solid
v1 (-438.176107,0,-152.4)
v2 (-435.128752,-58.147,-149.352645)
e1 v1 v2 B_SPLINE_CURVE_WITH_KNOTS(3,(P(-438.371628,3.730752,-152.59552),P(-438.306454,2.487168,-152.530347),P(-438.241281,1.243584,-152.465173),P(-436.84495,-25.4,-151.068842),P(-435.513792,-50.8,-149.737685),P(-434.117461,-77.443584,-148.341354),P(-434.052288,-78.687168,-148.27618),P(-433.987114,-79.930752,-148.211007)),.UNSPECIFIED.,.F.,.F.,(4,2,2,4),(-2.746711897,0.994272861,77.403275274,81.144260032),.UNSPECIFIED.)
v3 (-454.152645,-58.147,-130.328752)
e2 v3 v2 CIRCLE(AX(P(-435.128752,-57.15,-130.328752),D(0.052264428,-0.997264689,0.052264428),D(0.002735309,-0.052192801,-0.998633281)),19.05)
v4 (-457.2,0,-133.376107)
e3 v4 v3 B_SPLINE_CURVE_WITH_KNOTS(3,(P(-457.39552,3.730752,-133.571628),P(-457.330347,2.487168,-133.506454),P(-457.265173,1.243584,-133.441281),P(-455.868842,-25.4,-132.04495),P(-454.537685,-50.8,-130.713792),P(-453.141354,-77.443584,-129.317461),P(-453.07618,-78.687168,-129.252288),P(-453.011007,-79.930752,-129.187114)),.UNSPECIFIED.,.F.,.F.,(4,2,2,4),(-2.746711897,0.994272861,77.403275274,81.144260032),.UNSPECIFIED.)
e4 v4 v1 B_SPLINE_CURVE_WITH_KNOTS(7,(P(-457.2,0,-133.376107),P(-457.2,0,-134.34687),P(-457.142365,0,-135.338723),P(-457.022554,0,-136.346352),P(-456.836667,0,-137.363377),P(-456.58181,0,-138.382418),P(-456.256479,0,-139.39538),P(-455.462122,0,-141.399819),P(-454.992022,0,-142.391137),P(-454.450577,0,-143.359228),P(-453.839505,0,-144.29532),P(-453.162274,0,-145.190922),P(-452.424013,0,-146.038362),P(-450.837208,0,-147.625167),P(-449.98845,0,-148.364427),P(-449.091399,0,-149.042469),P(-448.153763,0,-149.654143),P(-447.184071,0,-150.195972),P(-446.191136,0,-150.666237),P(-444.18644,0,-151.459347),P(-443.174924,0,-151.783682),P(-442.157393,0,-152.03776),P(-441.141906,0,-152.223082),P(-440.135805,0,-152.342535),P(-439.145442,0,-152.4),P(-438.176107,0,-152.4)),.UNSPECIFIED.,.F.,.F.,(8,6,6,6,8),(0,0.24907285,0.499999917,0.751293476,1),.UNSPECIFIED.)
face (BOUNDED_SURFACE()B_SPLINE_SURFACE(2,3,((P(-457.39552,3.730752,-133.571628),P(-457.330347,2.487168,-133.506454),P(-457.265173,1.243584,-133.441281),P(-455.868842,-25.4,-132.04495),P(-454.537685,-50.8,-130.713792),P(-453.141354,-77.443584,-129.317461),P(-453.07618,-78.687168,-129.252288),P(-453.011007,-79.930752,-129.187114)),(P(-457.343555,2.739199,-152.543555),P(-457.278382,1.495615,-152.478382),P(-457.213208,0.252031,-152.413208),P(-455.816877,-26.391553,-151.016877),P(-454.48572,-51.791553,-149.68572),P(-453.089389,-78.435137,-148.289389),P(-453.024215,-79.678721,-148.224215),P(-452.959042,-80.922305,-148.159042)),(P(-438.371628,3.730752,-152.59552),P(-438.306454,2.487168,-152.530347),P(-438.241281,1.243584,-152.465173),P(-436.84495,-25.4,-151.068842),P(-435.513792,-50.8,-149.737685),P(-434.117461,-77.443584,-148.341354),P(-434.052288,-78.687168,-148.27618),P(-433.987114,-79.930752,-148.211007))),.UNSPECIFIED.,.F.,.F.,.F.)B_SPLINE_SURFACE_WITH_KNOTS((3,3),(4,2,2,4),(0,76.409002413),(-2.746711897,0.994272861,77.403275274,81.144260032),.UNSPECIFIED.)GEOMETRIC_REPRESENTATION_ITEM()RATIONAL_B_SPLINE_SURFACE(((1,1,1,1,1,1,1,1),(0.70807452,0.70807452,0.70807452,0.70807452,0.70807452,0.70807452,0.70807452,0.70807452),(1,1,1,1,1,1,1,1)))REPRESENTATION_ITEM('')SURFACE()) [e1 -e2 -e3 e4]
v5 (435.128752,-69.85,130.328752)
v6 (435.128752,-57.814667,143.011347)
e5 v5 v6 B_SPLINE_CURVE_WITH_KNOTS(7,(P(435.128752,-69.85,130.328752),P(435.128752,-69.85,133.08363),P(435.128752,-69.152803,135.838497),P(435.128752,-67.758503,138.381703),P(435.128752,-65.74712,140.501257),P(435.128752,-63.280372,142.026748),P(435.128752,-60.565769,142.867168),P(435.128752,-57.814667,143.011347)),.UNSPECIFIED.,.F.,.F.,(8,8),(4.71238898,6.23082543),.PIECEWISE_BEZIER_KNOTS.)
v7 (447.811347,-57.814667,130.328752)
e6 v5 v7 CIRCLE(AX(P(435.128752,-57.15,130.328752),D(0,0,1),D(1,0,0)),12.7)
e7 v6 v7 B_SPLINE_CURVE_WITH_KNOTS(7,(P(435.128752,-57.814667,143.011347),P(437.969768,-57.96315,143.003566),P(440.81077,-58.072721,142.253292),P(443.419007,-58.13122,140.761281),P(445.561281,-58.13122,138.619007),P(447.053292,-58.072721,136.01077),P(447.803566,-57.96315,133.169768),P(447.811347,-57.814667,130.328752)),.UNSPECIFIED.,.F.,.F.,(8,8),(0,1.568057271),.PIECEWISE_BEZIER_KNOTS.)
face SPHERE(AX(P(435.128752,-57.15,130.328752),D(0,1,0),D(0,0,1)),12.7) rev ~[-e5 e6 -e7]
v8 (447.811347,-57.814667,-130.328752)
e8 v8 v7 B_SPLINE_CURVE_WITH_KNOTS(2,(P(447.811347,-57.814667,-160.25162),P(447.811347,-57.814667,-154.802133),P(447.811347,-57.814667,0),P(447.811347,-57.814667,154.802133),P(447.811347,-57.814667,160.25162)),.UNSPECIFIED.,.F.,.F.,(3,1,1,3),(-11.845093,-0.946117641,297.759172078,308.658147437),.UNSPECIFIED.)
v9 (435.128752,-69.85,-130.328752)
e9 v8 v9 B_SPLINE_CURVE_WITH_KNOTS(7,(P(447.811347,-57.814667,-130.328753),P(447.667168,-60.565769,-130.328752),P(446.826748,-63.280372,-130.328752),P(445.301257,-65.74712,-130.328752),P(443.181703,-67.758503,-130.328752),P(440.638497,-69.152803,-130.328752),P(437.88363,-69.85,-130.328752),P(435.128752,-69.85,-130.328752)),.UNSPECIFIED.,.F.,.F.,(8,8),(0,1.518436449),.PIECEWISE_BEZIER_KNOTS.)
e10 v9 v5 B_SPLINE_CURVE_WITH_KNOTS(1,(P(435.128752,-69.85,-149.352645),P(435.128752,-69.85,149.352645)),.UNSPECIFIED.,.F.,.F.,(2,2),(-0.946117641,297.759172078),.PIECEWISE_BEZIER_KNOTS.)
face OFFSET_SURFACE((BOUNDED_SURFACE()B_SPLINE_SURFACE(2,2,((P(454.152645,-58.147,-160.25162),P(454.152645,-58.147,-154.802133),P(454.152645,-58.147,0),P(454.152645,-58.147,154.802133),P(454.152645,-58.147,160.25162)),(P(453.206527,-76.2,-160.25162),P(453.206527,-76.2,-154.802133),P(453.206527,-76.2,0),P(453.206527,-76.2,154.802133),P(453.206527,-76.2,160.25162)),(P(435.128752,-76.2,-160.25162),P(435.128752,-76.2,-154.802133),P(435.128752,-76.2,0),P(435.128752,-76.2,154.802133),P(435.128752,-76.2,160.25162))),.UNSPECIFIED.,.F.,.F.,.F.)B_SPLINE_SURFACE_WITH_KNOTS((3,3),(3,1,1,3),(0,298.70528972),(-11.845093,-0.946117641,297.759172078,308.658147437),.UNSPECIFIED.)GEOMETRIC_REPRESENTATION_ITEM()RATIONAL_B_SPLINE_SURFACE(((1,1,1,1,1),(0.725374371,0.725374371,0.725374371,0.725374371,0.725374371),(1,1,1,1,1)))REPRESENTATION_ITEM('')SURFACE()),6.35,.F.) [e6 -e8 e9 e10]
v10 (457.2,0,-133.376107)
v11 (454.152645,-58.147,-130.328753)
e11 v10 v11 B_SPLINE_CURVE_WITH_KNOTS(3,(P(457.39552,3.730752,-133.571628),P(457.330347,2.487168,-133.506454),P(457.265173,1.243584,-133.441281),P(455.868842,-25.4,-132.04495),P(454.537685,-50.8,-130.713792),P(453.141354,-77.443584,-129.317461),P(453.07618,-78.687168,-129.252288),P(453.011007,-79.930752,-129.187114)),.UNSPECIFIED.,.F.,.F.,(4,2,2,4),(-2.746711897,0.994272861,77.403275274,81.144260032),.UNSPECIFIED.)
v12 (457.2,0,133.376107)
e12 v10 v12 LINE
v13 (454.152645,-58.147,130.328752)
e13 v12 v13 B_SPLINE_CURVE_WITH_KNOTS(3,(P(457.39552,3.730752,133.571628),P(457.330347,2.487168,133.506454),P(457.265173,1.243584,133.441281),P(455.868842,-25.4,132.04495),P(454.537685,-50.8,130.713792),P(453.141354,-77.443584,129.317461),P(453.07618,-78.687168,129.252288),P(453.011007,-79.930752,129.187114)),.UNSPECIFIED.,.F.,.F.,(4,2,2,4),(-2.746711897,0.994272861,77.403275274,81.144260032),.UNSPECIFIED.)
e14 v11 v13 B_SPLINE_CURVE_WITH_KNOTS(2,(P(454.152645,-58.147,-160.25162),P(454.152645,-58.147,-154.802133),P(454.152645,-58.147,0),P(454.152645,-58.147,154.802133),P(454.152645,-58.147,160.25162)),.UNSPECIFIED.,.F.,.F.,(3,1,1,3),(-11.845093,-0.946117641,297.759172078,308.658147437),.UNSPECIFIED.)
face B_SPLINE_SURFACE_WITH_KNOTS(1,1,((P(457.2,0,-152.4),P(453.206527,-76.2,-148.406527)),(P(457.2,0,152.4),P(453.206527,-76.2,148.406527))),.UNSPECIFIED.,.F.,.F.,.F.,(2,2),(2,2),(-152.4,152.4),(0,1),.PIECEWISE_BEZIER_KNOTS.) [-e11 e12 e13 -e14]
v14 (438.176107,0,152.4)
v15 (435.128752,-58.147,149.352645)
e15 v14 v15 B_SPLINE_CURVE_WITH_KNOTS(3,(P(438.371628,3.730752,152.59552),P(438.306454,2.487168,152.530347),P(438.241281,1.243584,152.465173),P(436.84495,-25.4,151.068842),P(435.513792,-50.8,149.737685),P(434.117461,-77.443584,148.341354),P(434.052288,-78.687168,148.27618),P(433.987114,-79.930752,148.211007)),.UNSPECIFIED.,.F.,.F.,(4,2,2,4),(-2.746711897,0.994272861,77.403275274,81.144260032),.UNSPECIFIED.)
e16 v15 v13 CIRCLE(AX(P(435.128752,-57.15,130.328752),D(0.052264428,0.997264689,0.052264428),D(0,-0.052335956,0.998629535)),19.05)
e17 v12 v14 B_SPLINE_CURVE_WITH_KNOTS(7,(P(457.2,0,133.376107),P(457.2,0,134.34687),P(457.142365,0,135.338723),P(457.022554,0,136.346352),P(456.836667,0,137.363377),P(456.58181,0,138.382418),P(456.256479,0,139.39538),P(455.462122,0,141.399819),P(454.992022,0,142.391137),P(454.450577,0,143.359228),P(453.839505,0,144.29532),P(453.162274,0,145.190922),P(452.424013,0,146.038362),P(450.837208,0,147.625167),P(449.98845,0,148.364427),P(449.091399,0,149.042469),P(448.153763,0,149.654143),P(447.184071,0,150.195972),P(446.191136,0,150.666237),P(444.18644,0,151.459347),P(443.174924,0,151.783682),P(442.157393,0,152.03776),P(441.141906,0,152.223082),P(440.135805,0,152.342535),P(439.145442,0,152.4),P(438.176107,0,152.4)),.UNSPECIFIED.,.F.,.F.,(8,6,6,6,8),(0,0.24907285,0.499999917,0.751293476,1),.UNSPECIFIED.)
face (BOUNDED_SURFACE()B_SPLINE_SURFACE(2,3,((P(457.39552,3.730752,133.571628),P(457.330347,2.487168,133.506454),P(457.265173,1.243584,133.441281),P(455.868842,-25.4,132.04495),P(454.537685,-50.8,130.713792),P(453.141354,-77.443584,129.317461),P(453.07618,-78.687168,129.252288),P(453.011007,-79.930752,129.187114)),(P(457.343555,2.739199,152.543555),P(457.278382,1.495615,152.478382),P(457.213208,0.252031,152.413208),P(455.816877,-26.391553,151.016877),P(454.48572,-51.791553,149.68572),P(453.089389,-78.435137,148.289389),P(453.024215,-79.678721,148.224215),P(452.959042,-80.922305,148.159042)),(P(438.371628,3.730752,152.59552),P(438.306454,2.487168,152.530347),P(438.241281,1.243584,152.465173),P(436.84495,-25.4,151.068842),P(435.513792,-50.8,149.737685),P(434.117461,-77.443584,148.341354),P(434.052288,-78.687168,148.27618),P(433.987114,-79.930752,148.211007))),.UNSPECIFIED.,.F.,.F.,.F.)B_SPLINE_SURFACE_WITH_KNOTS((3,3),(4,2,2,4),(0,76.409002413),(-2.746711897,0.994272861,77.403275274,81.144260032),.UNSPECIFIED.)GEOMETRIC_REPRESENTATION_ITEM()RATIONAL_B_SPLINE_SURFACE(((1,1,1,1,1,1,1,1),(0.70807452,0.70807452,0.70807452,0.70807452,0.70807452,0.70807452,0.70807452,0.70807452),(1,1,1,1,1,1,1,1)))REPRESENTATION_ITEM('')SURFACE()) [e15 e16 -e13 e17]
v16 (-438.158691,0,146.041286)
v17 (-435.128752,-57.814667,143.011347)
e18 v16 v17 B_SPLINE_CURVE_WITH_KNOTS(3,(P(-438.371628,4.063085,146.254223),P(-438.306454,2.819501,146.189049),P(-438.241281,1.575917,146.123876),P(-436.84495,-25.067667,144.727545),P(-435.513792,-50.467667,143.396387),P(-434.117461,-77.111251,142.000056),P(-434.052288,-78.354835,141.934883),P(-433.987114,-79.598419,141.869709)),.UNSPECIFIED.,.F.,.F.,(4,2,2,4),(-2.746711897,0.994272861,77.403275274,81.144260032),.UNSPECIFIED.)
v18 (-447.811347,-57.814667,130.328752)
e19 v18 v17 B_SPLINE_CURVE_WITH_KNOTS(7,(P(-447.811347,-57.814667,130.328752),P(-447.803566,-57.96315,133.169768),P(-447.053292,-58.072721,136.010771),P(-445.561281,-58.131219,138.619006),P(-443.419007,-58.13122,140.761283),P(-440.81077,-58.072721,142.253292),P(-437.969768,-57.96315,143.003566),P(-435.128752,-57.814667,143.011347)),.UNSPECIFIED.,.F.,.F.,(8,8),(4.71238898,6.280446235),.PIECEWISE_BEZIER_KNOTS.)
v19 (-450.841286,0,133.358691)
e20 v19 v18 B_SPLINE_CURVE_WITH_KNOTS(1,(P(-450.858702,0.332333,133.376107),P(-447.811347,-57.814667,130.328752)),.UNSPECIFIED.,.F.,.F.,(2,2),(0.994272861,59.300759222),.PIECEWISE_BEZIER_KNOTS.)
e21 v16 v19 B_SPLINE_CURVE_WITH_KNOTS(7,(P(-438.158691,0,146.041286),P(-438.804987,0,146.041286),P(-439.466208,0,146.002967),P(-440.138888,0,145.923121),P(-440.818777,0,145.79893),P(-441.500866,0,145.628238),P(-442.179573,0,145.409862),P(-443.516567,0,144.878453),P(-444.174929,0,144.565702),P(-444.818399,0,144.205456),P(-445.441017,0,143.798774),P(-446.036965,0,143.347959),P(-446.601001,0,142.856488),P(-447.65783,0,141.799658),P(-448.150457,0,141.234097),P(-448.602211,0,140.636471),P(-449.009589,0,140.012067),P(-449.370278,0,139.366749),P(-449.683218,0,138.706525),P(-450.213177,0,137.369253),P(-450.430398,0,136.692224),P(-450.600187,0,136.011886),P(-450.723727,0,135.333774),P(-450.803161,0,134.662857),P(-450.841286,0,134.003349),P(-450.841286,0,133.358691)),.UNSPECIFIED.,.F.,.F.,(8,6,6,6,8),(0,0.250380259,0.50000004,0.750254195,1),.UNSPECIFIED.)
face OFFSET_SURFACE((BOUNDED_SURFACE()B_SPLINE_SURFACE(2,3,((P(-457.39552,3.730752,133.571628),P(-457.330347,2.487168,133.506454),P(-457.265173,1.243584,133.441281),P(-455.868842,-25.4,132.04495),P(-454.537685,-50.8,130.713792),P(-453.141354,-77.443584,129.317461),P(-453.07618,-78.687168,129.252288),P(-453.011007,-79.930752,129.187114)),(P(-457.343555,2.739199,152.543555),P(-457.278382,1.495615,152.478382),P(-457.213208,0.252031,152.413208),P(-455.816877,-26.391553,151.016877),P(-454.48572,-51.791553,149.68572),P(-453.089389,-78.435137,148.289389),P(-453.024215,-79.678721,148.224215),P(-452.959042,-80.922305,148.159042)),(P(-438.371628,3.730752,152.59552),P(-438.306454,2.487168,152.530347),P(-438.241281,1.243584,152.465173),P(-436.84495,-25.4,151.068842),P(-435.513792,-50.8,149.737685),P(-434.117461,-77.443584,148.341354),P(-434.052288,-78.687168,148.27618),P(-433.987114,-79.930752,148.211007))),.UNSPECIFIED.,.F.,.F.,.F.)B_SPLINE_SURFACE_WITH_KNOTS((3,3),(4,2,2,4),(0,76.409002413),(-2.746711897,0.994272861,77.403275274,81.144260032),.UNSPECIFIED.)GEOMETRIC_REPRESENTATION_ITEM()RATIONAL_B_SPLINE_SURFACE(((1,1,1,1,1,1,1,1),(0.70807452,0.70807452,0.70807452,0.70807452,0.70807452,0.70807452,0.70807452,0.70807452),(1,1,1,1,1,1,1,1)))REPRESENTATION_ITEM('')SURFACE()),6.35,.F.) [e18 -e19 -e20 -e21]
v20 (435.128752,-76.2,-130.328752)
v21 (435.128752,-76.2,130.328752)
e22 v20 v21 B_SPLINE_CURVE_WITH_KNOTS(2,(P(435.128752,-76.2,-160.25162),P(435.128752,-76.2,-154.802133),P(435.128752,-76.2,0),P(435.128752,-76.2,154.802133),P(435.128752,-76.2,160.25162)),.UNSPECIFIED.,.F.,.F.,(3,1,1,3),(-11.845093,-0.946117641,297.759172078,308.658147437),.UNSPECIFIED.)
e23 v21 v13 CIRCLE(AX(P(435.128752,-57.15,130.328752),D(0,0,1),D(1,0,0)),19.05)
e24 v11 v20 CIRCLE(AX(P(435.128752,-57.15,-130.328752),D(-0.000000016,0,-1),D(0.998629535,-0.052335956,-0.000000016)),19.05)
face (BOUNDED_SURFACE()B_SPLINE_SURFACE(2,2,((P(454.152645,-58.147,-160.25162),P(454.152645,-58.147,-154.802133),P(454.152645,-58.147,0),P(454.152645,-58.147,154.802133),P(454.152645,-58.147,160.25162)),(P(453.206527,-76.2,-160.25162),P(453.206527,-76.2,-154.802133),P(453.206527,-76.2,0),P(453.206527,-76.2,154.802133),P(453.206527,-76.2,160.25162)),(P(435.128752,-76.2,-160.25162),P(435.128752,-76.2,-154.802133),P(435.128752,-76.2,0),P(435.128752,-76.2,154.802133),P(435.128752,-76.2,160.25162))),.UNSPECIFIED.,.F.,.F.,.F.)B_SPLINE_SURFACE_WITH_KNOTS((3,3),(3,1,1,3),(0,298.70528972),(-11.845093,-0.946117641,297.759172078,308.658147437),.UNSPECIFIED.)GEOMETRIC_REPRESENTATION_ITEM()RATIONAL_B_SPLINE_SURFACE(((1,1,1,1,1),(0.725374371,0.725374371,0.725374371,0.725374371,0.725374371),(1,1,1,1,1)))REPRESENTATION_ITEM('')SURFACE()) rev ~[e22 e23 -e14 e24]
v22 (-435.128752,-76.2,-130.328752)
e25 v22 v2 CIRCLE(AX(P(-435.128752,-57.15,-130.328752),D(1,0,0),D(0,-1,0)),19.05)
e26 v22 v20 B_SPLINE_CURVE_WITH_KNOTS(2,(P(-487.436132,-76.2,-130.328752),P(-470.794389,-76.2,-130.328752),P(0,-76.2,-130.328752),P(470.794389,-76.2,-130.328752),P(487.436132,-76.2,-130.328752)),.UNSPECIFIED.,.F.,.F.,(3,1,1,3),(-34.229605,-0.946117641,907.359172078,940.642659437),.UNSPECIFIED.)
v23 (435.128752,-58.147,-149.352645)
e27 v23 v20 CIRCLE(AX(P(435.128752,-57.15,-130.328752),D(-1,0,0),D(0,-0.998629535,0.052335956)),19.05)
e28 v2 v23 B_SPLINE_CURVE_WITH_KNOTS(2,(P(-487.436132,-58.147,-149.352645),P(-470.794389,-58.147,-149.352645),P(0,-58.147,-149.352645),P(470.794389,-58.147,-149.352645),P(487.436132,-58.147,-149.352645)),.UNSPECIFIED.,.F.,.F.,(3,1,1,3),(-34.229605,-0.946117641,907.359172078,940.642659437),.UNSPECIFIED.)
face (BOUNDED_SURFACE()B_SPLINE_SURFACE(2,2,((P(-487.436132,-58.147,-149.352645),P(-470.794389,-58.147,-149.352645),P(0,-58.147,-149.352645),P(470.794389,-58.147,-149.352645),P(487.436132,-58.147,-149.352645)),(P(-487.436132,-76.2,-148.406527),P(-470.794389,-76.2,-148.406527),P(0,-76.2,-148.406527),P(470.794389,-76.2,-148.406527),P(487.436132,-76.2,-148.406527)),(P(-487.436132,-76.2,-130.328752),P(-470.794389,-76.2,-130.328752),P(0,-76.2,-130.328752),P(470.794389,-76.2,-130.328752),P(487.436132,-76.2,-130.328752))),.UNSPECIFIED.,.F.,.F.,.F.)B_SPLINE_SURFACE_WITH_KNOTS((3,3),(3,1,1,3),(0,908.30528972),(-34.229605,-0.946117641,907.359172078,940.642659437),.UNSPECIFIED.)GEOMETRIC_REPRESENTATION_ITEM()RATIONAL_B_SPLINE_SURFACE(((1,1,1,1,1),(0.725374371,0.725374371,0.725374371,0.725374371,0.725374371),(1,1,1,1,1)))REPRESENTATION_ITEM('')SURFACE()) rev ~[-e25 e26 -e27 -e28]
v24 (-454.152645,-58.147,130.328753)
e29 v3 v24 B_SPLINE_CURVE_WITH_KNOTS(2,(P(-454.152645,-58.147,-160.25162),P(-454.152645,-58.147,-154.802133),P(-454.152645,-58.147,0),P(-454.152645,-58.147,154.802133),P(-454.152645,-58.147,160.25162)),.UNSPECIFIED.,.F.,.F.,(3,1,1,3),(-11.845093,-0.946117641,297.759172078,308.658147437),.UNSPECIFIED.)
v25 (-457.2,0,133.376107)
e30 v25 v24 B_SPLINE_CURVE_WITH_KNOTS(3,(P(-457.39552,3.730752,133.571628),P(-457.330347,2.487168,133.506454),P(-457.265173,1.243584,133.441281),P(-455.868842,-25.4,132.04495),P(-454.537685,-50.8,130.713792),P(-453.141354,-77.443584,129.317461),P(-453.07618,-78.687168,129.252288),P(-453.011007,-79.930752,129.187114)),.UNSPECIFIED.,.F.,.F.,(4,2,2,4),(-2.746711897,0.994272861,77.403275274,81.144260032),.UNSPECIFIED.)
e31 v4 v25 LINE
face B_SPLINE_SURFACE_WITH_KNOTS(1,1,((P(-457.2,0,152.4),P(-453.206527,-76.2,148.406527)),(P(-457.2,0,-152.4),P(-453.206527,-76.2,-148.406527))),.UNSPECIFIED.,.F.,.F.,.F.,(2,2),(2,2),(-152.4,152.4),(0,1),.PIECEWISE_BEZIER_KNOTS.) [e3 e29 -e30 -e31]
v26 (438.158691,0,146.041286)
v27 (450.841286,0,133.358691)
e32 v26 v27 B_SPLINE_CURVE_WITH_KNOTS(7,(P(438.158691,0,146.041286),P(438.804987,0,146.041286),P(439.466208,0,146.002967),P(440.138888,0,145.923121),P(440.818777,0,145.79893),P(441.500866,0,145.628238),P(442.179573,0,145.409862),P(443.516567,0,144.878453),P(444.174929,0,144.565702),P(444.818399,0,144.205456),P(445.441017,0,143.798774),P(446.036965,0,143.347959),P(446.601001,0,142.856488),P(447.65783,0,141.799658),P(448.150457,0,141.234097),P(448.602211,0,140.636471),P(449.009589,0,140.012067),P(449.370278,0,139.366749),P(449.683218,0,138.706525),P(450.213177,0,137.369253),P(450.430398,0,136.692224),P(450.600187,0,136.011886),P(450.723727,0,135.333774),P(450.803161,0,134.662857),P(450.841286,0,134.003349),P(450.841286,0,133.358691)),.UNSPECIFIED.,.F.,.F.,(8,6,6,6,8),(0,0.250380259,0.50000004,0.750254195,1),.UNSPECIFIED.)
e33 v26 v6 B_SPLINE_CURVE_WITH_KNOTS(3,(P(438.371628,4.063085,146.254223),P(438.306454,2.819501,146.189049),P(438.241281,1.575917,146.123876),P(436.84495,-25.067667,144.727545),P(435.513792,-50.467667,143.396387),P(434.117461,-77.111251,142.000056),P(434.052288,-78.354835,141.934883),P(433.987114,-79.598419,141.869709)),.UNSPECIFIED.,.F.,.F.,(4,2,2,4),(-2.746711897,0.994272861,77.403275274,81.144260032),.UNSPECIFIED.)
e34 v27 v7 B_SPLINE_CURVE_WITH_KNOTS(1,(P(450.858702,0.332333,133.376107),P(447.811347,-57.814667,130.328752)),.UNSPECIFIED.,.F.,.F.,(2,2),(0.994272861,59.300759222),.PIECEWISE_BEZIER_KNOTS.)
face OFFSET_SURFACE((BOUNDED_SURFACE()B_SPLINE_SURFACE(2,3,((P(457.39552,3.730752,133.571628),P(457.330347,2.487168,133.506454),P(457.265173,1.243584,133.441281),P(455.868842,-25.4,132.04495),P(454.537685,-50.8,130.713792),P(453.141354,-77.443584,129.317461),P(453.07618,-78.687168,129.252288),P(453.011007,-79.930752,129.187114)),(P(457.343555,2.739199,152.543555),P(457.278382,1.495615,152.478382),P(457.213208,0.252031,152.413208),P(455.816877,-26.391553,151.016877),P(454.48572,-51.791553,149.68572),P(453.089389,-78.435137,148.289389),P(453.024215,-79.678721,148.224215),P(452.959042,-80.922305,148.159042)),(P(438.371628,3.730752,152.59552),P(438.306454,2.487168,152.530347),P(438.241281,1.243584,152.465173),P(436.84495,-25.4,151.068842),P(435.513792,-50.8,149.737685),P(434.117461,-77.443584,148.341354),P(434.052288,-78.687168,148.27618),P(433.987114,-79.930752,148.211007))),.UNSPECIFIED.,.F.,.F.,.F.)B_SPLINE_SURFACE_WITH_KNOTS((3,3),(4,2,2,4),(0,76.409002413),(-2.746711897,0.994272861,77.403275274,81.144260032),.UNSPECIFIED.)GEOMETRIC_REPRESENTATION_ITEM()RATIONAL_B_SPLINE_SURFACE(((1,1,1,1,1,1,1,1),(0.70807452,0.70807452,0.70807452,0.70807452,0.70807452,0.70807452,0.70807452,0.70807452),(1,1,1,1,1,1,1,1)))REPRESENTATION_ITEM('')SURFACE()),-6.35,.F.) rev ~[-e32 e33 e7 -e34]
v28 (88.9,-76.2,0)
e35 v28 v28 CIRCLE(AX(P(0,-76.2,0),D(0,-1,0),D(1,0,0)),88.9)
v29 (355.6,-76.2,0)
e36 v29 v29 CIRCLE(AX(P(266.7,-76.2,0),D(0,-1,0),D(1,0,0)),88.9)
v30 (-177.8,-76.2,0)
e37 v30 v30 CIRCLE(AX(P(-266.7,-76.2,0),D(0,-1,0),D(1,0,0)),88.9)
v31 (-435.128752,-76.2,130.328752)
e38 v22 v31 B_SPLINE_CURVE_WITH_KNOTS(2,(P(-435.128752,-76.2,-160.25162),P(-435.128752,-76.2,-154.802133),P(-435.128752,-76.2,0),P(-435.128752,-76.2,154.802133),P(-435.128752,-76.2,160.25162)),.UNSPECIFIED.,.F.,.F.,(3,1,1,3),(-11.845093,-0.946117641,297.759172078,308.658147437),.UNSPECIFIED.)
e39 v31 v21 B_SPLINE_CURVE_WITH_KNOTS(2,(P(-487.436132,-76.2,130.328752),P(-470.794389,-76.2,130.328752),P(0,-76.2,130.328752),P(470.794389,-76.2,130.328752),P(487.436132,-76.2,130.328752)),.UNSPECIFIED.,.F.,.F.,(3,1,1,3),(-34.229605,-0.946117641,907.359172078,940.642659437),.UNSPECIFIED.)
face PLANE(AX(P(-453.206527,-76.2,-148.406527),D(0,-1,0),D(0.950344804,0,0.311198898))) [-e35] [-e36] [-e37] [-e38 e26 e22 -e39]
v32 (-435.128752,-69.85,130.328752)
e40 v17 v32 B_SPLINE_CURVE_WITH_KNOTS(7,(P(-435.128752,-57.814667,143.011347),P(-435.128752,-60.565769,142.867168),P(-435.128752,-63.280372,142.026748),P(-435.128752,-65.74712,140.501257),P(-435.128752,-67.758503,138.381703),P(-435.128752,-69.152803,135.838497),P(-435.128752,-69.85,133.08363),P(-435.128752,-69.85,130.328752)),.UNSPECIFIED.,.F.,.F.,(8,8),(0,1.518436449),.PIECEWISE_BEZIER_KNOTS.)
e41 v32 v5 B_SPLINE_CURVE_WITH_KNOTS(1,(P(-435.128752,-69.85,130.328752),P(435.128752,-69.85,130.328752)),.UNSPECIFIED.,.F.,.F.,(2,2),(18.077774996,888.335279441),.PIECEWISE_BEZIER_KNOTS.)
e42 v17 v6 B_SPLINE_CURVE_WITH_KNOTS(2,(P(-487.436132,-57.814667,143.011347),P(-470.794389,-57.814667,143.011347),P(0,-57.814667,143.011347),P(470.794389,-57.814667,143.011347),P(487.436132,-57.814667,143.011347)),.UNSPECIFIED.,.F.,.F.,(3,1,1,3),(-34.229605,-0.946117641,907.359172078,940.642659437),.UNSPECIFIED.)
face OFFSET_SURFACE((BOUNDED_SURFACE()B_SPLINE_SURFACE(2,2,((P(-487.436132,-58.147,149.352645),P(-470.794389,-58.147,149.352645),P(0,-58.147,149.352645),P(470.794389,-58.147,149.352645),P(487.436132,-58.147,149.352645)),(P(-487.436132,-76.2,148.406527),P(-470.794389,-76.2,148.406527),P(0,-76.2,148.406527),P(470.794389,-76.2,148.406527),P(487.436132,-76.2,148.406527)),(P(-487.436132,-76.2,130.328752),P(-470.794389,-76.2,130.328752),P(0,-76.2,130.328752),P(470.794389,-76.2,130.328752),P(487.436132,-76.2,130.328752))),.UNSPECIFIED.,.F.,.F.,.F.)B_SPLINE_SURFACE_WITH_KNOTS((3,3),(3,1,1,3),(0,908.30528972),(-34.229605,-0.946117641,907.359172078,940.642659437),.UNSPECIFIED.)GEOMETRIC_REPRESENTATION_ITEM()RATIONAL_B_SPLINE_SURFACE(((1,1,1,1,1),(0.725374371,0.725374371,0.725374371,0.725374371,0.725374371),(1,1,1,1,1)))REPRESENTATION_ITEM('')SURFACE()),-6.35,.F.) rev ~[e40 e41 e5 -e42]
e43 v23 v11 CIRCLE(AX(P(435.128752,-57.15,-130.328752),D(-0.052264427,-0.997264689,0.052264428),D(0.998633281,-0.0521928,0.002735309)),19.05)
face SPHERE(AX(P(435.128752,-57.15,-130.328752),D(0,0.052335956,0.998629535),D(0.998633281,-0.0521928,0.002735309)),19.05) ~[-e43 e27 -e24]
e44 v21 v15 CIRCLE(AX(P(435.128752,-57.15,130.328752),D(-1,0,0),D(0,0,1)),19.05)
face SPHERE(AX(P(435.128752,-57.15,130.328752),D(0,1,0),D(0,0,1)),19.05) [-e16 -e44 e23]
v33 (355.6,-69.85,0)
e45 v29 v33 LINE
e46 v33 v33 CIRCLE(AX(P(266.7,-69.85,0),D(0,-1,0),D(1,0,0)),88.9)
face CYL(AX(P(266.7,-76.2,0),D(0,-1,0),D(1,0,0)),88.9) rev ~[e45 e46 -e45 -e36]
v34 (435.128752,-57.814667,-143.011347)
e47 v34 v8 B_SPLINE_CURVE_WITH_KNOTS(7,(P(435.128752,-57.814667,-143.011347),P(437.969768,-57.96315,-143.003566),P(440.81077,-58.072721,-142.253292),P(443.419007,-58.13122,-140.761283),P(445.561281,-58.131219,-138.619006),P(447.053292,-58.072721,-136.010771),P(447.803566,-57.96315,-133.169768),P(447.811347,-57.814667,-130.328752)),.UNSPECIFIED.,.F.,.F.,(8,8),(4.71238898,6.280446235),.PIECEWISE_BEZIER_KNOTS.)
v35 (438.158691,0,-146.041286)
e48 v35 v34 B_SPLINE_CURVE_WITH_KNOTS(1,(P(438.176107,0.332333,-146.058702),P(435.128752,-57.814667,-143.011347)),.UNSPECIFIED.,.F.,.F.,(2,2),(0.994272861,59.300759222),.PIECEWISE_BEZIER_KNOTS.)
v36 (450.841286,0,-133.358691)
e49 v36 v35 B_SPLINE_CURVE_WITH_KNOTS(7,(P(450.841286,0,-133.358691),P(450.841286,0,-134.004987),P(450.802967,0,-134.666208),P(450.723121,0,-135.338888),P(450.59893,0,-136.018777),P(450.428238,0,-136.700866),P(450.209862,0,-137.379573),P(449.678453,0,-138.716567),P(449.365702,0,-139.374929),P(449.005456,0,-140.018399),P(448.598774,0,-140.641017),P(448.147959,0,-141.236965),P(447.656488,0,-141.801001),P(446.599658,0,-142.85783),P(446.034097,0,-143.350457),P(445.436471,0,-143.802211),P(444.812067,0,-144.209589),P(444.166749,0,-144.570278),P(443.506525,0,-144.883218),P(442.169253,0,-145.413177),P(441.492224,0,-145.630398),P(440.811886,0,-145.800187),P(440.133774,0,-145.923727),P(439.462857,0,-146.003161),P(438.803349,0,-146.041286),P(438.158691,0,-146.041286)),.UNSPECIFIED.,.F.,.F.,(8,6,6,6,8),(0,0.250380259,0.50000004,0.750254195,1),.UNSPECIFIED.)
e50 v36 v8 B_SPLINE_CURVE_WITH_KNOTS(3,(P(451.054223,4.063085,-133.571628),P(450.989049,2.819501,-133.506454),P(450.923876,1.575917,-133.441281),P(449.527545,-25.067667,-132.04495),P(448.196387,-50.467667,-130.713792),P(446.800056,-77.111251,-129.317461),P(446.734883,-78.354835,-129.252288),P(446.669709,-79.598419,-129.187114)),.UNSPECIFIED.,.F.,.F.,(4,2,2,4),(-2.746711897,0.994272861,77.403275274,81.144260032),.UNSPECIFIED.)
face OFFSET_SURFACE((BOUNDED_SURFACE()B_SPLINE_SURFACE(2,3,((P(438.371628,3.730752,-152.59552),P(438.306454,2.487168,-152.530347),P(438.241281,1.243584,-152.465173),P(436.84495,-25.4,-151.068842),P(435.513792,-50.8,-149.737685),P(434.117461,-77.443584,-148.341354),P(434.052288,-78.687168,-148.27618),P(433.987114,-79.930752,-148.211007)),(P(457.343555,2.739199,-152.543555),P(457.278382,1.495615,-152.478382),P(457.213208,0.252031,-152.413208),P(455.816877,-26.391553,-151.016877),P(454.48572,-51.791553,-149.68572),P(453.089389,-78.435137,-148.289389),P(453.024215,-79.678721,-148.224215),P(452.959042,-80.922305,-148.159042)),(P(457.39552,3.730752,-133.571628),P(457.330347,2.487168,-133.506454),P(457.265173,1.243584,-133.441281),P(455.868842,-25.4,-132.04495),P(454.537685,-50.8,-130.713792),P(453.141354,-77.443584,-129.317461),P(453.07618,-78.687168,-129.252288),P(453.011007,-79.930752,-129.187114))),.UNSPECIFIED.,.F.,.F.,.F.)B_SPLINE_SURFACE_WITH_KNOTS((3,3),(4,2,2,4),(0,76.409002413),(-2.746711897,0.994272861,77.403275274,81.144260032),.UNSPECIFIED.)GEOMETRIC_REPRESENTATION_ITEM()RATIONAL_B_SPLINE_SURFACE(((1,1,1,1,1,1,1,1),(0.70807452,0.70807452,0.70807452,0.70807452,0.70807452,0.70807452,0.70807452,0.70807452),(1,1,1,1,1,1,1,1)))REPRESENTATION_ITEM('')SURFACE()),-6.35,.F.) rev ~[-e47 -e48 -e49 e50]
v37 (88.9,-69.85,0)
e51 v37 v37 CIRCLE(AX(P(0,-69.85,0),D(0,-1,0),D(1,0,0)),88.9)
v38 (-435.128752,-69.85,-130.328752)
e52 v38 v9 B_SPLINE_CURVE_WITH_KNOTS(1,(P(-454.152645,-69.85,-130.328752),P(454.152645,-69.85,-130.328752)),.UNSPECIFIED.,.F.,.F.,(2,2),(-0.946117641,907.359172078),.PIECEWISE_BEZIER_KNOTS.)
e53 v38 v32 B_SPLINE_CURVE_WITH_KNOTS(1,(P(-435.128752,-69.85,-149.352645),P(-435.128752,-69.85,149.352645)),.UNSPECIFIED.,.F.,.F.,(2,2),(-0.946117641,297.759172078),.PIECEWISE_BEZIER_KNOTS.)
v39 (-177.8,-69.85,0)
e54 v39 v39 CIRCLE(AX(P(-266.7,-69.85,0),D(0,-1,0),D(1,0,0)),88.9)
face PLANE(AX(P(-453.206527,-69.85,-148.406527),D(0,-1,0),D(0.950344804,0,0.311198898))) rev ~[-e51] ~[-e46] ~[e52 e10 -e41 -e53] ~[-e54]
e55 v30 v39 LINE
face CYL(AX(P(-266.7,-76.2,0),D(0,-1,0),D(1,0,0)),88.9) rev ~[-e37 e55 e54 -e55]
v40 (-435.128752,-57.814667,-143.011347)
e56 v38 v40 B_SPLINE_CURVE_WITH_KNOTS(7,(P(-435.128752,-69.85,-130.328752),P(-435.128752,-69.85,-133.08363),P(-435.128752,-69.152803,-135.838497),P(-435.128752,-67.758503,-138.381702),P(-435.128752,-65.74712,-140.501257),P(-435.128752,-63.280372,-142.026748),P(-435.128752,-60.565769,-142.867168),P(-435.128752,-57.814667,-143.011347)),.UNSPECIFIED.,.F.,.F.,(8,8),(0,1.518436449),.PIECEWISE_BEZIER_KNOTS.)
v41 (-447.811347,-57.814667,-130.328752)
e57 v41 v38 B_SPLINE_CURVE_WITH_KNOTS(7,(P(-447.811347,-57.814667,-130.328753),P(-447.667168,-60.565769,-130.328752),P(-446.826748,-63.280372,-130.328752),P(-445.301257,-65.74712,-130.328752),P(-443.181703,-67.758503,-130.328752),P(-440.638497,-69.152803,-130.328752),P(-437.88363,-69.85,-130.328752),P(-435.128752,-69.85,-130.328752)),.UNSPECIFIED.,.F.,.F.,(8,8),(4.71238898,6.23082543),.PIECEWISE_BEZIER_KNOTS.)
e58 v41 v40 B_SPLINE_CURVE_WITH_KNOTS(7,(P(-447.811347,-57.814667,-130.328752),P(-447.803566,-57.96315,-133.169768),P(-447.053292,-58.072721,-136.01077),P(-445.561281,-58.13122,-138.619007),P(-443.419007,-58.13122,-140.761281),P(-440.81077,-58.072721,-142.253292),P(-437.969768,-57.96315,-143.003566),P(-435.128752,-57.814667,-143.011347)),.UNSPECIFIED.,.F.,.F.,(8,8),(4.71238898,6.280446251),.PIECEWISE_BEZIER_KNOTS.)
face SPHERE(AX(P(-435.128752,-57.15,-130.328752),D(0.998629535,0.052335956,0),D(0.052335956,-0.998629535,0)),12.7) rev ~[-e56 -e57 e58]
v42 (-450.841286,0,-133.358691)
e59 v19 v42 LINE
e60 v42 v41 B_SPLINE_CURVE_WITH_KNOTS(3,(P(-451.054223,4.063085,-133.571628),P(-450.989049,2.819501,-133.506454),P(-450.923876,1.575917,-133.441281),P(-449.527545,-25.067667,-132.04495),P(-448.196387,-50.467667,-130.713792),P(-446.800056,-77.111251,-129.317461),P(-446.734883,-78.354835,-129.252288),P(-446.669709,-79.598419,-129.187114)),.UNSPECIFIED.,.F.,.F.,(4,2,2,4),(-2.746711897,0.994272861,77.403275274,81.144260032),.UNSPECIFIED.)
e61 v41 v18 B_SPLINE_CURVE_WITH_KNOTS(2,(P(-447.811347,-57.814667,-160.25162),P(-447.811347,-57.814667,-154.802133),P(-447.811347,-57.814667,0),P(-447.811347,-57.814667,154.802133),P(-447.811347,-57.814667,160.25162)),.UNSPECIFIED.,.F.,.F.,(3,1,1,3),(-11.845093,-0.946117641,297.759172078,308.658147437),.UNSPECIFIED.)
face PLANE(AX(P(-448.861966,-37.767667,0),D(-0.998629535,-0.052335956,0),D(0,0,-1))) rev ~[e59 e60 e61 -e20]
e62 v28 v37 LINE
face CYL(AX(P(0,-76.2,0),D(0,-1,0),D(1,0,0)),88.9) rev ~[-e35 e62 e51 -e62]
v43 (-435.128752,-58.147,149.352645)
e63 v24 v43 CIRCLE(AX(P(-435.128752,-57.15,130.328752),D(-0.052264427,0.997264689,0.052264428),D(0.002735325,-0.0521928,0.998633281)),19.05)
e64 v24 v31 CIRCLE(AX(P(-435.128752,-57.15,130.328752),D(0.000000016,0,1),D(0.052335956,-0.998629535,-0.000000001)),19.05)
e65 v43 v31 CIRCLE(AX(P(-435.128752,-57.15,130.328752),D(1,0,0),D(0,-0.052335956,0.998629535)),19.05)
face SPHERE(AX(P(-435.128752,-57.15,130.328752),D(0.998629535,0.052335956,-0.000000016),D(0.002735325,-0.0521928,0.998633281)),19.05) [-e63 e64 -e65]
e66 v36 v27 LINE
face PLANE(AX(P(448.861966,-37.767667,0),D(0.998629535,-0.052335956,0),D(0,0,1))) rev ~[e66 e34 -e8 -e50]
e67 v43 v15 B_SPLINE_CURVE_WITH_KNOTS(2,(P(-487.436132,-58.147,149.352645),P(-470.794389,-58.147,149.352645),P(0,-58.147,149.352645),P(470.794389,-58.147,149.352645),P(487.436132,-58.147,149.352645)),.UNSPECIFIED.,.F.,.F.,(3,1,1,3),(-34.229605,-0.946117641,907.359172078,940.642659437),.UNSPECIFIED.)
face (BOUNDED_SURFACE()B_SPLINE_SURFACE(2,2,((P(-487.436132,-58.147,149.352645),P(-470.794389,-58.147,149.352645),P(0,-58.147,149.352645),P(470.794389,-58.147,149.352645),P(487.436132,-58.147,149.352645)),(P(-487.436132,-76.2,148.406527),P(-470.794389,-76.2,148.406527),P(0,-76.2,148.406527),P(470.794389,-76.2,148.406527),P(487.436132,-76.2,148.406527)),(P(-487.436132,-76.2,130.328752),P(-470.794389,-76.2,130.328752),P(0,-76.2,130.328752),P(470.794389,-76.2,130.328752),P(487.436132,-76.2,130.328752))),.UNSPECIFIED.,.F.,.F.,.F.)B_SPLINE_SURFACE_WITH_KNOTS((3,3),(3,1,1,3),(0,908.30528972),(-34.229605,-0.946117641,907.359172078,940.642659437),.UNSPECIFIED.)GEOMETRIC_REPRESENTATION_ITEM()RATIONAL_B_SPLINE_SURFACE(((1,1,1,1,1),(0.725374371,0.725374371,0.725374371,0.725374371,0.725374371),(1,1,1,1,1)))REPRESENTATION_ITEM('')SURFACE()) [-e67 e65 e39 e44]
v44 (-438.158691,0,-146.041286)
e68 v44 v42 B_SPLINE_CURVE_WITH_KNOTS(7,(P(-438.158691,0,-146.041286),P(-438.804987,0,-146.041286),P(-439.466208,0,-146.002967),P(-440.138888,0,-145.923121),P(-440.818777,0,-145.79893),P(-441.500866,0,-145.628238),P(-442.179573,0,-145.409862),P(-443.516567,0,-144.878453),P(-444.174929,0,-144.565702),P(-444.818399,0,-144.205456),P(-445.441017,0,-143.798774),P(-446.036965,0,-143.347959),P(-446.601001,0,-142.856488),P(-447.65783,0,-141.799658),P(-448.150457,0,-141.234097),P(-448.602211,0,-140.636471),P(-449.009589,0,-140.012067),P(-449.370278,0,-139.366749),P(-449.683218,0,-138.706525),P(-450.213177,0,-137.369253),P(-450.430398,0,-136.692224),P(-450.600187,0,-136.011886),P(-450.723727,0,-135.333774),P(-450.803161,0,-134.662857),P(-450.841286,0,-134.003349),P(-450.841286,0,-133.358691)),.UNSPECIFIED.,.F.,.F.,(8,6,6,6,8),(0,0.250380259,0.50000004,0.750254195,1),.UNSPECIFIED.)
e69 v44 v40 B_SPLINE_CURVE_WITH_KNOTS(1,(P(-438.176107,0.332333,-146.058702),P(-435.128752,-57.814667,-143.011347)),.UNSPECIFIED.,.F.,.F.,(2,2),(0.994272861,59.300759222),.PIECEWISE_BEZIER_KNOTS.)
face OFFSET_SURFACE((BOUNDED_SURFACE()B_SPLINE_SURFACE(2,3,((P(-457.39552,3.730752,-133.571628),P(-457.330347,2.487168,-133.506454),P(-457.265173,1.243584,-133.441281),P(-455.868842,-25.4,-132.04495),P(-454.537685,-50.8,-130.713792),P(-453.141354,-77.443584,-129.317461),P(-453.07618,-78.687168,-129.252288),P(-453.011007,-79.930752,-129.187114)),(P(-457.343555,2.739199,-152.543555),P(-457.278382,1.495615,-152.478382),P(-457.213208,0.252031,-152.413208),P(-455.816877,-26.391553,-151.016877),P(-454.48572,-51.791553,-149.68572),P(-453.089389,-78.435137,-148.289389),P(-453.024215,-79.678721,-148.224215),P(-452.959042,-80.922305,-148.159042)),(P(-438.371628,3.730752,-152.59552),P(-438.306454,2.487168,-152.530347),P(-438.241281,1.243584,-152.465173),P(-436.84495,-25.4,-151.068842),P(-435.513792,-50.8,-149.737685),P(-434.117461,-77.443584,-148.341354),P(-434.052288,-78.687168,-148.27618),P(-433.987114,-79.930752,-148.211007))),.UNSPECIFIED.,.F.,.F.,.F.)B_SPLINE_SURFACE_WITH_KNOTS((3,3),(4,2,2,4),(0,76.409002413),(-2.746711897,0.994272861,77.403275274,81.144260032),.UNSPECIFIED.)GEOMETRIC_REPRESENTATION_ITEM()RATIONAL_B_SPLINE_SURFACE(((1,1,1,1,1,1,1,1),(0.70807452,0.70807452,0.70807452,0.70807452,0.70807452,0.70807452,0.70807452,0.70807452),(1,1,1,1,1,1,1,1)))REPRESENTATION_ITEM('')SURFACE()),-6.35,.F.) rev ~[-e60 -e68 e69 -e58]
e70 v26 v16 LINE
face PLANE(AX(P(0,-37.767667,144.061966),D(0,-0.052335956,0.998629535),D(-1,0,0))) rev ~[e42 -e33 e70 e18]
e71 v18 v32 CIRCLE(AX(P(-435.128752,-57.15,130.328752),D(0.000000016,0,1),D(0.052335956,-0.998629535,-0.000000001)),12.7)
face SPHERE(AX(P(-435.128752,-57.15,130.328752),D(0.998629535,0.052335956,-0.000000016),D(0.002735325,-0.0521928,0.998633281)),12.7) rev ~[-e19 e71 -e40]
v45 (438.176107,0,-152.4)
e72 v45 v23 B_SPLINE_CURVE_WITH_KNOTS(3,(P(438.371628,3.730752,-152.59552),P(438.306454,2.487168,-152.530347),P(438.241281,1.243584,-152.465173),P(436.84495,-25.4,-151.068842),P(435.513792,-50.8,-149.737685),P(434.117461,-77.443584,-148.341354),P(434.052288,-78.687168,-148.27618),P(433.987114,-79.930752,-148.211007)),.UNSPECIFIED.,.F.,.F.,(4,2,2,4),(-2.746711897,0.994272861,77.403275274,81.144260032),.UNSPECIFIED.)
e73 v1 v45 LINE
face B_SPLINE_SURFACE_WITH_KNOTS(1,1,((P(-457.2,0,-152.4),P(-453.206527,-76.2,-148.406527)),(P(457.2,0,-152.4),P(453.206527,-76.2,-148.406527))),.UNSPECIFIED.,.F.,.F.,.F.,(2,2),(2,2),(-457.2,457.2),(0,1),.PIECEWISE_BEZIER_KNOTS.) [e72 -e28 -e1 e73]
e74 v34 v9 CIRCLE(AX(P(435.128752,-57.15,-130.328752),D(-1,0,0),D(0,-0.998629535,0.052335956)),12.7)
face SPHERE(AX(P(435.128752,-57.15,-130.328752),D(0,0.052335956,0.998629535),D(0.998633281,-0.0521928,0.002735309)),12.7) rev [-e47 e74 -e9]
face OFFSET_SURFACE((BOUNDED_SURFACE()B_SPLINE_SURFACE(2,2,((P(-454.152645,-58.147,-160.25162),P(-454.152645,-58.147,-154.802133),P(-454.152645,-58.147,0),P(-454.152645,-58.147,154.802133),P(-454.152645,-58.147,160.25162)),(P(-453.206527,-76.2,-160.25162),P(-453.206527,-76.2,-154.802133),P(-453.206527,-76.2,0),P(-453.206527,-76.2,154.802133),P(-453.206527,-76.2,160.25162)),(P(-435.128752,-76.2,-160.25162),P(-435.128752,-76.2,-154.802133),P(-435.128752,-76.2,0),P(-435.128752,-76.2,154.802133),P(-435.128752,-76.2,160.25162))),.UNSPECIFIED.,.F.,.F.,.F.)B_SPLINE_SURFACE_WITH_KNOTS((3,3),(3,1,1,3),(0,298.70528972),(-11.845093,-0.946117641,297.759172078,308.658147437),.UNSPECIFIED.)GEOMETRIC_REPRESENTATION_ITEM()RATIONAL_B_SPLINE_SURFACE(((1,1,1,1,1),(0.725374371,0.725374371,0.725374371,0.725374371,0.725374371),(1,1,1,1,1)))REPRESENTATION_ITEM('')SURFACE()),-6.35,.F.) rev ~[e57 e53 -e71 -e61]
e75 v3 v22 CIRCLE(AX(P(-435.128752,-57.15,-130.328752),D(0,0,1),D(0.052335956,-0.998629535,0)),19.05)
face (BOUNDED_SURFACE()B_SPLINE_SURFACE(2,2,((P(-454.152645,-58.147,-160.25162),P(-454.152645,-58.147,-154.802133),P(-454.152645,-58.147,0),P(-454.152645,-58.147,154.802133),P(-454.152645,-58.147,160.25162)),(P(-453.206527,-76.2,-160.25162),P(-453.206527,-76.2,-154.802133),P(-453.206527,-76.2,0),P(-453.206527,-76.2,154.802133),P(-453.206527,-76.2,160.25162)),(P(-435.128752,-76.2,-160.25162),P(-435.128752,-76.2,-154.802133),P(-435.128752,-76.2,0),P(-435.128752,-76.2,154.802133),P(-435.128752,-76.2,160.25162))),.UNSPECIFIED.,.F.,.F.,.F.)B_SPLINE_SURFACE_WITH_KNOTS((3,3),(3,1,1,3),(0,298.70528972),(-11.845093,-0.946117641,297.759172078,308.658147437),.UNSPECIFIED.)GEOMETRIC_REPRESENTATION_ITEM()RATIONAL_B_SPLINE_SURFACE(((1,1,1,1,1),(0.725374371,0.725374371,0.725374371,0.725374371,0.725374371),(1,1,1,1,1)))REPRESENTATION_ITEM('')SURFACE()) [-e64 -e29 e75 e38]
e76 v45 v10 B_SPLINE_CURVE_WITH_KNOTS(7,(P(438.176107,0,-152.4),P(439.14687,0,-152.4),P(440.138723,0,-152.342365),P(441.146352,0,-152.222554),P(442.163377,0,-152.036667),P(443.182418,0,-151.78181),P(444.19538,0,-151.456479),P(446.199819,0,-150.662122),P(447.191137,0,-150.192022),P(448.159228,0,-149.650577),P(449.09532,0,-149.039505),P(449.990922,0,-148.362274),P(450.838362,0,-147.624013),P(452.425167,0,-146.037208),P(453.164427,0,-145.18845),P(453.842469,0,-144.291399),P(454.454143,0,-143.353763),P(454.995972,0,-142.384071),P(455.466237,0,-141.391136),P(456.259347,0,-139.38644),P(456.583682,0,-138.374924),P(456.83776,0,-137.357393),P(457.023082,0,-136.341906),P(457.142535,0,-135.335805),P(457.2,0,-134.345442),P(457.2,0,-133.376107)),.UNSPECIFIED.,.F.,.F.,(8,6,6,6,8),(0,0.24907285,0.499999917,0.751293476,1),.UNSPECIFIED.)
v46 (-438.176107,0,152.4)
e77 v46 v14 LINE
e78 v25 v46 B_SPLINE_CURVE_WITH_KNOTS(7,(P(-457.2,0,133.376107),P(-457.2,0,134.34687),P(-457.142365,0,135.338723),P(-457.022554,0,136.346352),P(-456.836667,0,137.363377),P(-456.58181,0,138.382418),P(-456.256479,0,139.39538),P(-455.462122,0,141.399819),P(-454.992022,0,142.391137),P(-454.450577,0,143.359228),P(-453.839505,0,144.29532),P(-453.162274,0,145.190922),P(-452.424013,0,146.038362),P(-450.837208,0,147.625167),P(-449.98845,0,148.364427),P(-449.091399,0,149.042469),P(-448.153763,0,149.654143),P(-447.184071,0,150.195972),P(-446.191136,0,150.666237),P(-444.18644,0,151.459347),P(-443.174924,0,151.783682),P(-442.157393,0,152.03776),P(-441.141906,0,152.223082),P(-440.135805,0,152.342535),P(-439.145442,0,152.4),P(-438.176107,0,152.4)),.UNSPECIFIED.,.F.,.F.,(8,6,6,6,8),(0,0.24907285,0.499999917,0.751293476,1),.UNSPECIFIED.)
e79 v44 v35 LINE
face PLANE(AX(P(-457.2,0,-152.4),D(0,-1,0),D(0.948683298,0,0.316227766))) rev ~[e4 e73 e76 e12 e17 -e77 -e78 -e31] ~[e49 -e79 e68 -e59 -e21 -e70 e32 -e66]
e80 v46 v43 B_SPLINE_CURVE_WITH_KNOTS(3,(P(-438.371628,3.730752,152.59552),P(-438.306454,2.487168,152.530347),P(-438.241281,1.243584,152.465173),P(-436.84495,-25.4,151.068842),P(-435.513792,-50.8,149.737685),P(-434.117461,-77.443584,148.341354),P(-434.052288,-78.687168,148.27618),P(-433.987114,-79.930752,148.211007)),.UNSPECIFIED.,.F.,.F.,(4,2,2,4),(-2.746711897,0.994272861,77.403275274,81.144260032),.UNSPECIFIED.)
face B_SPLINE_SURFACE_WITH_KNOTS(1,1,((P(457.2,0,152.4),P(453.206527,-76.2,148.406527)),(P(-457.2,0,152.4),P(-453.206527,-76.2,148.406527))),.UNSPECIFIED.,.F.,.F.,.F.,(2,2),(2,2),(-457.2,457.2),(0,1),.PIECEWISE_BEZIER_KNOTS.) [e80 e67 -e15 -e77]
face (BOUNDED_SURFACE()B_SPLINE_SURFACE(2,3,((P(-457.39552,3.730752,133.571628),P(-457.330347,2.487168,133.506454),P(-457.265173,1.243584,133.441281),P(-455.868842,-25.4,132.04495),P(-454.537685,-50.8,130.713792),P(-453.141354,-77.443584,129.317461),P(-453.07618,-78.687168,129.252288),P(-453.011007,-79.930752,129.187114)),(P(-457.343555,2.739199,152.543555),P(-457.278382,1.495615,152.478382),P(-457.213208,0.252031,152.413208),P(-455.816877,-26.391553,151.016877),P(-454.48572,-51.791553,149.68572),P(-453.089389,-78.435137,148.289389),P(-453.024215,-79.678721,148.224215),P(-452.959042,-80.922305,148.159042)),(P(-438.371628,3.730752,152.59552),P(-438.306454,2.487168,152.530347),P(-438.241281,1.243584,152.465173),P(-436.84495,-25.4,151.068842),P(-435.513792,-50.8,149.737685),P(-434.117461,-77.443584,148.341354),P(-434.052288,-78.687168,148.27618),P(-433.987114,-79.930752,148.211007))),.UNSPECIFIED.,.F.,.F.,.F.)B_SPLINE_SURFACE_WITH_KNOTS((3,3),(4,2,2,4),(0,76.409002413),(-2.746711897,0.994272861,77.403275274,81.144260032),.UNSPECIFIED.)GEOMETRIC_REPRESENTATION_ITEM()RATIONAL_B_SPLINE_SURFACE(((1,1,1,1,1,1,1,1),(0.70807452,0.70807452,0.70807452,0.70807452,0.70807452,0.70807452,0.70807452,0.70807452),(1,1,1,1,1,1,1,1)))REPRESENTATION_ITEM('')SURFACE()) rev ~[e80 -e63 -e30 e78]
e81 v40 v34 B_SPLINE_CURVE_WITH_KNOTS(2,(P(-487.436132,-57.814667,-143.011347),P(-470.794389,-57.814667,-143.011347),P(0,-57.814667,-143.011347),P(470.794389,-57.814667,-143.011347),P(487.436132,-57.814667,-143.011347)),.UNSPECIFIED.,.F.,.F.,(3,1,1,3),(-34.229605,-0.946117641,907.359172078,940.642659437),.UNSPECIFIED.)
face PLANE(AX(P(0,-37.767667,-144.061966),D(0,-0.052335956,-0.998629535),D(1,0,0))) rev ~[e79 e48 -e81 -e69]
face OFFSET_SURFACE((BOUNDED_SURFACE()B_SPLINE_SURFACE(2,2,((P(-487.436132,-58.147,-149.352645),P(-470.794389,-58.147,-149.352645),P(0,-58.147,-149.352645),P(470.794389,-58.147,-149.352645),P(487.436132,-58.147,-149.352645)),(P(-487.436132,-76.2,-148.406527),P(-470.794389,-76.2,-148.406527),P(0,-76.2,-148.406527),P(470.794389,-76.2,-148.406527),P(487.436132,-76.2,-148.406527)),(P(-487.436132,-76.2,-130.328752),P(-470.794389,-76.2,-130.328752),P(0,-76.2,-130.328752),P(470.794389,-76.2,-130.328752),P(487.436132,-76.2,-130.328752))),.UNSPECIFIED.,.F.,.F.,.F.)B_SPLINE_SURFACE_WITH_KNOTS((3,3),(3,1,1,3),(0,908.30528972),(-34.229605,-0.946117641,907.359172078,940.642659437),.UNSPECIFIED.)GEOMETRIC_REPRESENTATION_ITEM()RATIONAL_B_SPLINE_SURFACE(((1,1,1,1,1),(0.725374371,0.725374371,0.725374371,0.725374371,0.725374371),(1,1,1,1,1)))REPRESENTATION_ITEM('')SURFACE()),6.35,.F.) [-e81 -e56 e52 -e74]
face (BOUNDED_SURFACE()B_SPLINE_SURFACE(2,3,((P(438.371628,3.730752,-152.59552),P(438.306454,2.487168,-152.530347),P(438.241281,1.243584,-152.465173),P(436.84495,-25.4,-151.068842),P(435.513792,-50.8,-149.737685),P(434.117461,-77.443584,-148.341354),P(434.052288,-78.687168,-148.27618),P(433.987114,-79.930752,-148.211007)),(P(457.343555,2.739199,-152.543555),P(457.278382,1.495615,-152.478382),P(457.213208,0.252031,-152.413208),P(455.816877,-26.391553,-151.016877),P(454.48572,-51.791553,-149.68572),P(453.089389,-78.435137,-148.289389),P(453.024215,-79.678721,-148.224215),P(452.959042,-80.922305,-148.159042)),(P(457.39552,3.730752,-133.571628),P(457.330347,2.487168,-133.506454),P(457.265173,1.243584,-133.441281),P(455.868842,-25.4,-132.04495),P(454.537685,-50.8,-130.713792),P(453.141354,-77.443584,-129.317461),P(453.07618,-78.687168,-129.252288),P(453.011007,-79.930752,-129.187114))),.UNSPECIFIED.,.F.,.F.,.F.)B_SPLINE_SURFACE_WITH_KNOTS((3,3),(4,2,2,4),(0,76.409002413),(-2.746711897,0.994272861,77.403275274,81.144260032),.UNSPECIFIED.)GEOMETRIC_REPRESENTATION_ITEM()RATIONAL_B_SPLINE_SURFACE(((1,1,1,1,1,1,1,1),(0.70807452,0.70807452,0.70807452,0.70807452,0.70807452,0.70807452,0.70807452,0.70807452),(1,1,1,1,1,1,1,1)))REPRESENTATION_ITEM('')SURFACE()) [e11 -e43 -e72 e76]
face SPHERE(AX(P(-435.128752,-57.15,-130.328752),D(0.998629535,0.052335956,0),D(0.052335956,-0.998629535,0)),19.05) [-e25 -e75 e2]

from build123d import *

# Parameters (mm, degrees)
F0_W     = 914.4
F0_H     = 304.8
F1_DEPTH = 76.2
F1_TAPER = 3
F2_R     = 19.05
F3_T     = 6.35
F4_R     = 88.9
F5_DEPTH = 76.2010001


# Not quite as in the source:
# - a shell that OpenCascade refuses in one call is made with other operations: the cavity is built on its own and cut out


with BuildPart() as f1:
    # F0 (on Front) → F1 (new body)
    with BuildSketch(Plane.XZ):
        Rectangle(F0_W, F0_H)
    extrude(amount=F1_DEPTH, taper=F1_TAPER)

    # F2
    f2_edges = [f1.edges().sort_by_distance(p)[0] for p in [
        (455.203264, -38.1, 150.403264),
        (0, -76.2, 148.406527),
        (453.206527, -76.2, 0),
        (455.203264, -38.1, -150.403264),
        (0, -76.2, -148.406527),
        (-455.203264, -38.1, 150.403264),
        (-453.206527, -76.2, 0),
        (-455.203264, -38.1, -150.403264),
    ]]
    fillet(f2_edges, radius=F2_R)

    # F3: shell of thickness 6.35, made by hand


with BuildPart() as f3_core1:
    # F3_t2: copy of F1
    add(f1.part)

    # the walls: a layer under each face that stays
    f3_faces = [f3_core1.faces().sort_by_distance(p)[0] for p in [
        (0, -29.0734999832, 150.8763224299),
        (450.0967392281, -29.2790219143, 145.2967392281),
        (-450.0967392281, -29.2790219142, 145.2967392281),
        (0, -70.9683817678, 143.4419068897),
        (455.6763224299, -29.0734999832, 0),
        (-455.6763224299, -29.0734999832, 0),
        (450.0967392281, -29.2790219142, -145.2967392281),
        (-450.0967392281, -29.2790219142, -145.2967392281),
        (0, -29.0734999832, -150.8763224299),
        (444.4011528131, -70.968381766, 139.6011528105),
        (-448.0884256524, -67.5999269998, 139.5887948951),
        (0, -76.2, 0),
        (448.2419068897, -70.9683817678, 0),
        (-448.2419068897, -70.9683817678, 0),
        (444.388794687, -67.5999269998, -143.2884258011),
        (-448.0884256897, -67.5999270772, -139.5887947556),
        (0, -70.9683817678, -143.4419068897),
    ]]
    thicken(f3_faces, amount=-F3_T, mode=Mode.SUBTRACT)


with BuildPart() as f1_1:
    add(f1.part)

    # what is left inside the walls is the cavity
    f3_cavity = [f3_core1.part.solids().sort_by_distance(p)[0] for p in [
        (29.280349, -0.0635, -87.84086),
    ]]
    add(f3_cavity, mode=Mode.SUBTRACT)

    # F4 (on face) → F5 (cut, through all)
    with BuildSketch(Plane.XZ.offset(76.2)):
        with Locations((266.7, 0)):
            Circle(F4_R)
        Circle(F4_R)
        with Locations((-266.7, 0)):
            Circle(F4_R)
    extrude(amount=-F5_DEPTH, mode=Mode.SUBTRACT)


solid = f1_1.part
